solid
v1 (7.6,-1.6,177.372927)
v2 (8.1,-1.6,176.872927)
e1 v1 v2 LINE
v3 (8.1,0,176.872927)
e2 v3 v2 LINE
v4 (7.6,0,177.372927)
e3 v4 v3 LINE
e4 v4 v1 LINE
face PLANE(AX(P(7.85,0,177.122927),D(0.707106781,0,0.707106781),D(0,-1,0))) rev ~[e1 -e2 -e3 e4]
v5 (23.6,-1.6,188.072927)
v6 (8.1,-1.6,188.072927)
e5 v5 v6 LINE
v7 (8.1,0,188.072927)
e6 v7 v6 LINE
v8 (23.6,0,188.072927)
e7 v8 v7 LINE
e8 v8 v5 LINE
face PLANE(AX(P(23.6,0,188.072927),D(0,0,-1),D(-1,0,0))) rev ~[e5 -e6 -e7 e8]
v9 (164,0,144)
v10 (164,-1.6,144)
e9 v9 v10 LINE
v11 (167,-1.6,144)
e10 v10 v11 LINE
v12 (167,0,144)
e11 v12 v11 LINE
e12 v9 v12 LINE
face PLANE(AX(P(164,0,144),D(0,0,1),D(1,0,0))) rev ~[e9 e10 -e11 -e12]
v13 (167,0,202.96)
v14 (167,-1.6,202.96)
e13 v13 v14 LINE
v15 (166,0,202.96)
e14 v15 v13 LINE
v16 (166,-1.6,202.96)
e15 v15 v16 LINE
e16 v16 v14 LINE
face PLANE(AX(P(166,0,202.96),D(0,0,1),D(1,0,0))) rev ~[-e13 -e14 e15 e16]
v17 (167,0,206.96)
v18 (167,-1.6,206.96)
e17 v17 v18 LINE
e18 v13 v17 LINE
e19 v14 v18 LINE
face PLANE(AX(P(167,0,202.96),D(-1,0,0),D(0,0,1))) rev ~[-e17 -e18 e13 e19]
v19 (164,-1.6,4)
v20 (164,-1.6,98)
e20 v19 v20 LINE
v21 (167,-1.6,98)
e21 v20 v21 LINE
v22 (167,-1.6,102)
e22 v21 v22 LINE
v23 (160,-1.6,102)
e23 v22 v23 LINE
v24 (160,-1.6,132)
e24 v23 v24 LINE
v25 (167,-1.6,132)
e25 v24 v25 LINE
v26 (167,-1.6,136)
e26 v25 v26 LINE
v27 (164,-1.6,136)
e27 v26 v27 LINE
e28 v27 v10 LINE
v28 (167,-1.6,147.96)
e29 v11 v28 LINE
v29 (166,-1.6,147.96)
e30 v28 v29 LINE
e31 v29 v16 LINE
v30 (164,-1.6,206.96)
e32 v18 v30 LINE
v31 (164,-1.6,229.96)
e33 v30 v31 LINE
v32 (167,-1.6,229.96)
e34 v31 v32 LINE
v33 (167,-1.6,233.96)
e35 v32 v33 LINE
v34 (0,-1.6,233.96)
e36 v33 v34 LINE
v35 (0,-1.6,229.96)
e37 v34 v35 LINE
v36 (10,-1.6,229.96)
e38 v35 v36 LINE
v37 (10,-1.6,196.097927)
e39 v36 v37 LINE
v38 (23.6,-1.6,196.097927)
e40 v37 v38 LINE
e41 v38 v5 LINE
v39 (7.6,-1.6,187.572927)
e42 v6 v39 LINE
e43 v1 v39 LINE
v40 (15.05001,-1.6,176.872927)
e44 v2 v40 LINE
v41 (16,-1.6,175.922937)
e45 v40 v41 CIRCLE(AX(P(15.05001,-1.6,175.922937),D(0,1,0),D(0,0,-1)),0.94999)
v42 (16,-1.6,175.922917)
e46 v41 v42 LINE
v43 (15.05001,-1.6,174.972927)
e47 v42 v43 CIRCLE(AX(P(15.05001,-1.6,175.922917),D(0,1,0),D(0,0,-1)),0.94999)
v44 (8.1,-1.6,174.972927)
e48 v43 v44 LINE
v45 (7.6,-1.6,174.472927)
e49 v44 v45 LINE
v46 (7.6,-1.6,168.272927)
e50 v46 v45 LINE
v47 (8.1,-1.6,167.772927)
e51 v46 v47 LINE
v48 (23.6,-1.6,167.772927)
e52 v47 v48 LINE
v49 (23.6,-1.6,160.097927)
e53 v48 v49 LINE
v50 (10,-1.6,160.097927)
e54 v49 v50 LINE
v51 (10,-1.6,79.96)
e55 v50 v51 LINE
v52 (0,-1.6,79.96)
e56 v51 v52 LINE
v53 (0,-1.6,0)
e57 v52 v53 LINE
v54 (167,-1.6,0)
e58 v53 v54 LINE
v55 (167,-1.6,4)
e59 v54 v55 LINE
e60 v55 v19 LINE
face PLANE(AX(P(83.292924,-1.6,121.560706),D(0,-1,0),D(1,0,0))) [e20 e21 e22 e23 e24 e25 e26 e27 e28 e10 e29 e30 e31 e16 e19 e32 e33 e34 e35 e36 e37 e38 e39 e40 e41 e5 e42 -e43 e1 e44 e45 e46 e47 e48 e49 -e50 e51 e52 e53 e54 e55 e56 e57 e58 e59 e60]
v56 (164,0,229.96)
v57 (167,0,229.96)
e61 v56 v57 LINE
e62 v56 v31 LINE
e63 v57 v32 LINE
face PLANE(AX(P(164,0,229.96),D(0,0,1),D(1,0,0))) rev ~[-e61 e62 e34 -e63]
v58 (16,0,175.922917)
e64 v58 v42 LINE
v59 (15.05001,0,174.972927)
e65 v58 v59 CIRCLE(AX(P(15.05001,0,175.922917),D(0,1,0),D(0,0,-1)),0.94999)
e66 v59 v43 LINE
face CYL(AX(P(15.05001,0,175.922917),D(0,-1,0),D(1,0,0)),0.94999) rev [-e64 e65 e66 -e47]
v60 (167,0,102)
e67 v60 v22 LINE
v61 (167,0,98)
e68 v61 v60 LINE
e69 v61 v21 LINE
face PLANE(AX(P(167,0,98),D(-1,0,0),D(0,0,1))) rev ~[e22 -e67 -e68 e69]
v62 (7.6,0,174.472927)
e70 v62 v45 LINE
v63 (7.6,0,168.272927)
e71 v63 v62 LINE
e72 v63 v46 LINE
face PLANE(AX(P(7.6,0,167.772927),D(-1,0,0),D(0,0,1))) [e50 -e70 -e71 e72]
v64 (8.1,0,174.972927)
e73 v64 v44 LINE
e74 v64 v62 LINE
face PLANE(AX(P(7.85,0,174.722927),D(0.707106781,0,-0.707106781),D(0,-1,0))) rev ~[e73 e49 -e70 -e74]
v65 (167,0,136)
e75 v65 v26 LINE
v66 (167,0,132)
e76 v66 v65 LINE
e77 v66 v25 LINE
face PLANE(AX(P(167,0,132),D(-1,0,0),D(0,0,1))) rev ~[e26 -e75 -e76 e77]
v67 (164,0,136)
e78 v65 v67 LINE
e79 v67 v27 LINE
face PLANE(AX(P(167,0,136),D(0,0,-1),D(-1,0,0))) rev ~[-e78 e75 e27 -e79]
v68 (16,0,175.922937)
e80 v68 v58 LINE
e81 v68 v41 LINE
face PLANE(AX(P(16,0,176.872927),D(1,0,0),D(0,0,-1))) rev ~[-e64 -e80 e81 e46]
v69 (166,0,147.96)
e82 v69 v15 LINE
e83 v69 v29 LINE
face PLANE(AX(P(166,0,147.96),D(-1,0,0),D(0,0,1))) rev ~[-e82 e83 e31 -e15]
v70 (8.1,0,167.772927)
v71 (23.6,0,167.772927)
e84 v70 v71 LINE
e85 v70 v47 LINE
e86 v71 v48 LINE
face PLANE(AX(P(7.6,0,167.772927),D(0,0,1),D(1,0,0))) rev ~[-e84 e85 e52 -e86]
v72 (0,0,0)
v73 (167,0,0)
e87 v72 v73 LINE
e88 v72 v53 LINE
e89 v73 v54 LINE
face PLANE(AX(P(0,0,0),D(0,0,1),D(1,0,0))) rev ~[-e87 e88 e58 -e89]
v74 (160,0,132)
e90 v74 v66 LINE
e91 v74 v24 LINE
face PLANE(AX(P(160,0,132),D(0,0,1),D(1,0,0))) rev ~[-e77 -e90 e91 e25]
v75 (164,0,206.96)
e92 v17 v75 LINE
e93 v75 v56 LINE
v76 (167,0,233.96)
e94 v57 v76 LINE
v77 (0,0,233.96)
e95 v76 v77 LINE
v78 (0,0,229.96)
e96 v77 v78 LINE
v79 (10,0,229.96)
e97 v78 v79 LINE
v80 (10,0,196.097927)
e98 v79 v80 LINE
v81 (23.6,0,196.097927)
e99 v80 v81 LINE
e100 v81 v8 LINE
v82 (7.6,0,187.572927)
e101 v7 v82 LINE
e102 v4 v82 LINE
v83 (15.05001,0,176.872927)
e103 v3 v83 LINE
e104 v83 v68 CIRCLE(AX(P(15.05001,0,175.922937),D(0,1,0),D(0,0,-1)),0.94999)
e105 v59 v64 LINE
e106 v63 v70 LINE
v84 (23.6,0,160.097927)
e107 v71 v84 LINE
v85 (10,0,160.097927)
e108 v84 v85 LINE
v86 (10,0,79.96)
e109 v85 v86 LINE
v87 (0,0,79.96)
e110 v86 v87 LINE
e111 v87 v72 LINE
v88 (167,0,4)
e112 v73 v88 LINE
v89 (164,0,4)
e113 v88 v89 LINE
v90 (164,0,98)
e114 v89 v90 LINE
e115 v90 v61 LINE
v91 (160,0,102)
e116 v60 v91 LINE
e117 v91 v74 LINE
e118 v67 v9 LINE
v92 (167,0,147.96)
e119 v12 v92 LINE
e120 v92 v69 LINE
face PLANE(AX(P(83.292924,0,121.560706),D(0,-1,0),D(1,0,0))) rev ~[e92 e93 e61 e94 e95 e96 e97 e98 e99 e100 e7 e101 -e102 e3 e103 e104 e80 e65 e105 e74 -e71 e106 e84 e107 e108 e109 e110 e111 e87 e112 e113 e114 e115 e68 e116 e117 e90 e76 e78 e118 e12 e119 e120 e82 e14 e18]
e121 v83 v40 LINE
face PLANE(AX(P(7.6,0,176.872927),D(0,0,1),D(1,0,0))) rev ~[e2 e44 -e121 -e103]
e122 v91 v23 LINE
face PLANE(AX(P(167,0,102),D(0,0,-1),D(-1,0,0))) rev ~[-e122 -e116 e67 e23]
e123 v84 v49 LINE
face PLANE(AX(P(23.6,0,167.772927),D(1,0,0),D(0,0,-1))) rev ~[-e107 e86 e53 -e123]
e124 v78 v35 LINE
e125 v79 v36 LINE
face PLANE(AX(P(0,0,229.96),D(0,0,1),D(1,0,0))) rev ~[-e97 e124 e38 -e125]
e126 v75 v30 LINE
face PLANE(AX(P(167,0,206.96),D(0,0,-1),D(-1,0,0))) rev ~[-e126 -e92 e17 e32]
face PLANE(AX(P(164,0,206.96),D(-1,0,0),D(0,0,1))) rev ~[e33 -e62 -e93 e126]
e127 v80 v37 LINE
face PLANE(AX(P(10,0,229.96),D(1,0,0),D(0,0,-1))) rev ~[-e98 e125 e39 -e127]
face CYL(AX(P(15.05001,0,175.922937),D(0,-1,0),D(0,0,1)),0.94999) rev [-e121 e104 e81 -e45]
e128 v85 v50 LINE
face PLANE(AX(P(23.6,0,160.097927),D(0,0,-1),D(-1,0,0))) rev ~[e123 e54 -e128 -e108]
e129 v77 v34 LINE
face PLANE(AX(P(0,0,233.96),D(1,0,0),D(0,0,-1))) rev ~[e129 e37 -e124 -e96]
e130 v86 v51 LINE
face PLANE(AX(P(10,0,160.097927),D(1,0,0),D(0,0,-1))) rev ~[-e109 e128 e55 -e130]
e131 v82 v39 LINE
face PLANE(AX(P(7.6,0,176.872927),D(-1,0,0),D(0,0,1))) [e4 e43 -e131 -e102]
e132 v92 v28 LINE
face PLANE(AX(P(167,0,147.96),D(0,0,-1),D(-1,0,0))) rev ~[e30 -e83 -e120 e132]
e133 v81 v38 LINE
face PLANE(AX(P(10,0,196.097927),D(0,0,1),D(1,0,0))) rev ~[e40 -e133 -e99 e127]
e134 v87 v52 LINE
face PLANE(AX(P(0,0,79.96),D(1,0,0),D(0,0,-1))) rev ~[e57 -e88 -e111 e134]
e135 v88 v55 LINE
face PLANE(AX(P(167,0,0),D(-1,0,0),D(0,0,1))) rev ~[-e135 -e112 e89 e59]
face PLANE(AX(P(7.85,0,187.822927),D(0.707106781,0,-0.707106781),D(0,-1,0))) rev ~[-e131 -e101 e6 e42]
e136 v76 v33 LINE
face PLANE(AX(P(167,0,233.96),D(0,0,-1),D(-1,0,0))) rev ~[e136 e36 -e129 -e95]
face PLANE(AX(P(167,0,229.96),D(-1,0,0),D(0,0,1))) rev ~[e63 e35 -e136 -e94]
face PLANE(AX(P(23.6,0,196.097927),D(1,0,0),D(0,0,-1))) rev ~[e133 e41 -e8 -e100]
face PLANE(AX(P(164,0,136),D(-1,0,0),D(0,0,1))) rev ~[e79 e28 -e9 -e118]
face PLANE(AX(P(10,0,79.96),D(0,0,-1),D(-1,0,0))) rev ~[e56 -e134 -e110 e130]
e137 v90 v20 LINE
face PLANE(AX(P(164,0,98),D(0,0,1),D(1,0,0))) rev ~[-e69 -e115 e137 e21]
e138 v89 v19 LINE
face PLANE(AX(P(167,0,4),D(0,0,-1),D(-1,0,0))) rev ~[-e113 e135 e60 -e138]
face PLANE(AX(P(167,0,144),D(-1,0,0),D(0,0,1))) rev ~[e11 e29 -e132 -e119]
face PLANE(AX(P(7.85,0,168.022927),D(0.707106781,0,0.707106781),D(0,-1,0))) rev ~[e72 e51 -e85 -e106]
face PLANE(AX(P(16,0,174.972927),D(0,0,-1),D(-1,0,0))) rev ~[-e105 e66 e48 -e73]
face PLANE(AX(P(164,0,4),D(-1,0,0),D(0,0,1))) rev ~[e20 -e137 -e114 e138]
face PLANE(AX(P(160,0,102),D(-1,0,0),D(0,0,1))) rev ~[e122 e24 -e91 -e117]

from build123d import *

# Parameters (mm, degrees)
F0_W     = 10.2457383797
F0_H     = 20.3
F0_W_2   = 2.4
F0_H_2   = 7.2
F0_H_3   = 11.2
F1_DEPTH = 1.6
F2_SIZE  = 0.5
F3_R     = 0.94999


# Not quite as in the source:
# - a fillet or chamfer is up to 0.001 mm smaller than in the source, because OpenCascade refuses the exact size


with BuildPart() as f1:
    # F0 (on Front) → F1 (new body)
    with BuildSketch(Plane.XZ):
        Polygon((0, 79.96), (0, 0), (167, 0), (167, 4), (164, 4), (164, 98), (167, 98), (167, 102), (160, 102), (160, 132), (167, 132), (167, 136), (164, 136), (164, 144), (167, 144), (167, 147.96), (166, 147.96), (166, 202.96), (167, 202.96), (167, 206.96), (164, 206.96), (164, 229.96), (167, 229.96), (167, 233.96), (0, 233.96), (0, 229.96), (10, 229.96), (10, 196.0979268551), (23.6, 196.0979268551), (23.6, 188.0729268551), (33.8457383797, 188.0729268551), (33.8457383797, 167.7729268551), (23.6, 167.7729268551), (23.6, 160.0979268551), (10, 160.0979268551), (10, 79.96), align=None)
        with Locations((28.7228691898, 177.9229268551)):
            Rectangle(F0_W, F0_H)
        Polygon((10, 174.9729268551), (10, 167.7729268551), (23.6, 167.7729268551), (23.6, 188.0729268551), (10, 188.0729268551), (10, 176.8729268551), (16, 176.8729268551), (16, 174.9729268551), align=None)
        with Locations((8.8, 171.3729268551)):
            Rectangle(F0_W_2, F0_H_2)
        with Locations((8.8, 182.4729268551)):
            Rectangle(F0_W_2, F0_H_3)
    extrude(amount=F1_DEPTH)

    # F2
    f2_edges = [f1.edges().sort_by_distance(p)[0] for p in [
        (7.6, -0.8, 167.772927),
        (7.6, -0.8, 174.972927),
        (7.6, -0.8, 176.872927),
        (7.6, -0.8, 188.072927),
    ]]
    chamfer(f2_edges, length=F2_SIZE)

    # F3 (radius 0.95 in the source; OpenCascade refuses exactly that, so slightly less here)
    f3_edges = [f1.edges().sort_by_distance(p)[0] for p in [
        (16, -0.8, 176.872927),
        (16, -0.8, 174.972927),
    ]]
    fillet(f3_edges, radius=F3_R)


solid = f1.part
